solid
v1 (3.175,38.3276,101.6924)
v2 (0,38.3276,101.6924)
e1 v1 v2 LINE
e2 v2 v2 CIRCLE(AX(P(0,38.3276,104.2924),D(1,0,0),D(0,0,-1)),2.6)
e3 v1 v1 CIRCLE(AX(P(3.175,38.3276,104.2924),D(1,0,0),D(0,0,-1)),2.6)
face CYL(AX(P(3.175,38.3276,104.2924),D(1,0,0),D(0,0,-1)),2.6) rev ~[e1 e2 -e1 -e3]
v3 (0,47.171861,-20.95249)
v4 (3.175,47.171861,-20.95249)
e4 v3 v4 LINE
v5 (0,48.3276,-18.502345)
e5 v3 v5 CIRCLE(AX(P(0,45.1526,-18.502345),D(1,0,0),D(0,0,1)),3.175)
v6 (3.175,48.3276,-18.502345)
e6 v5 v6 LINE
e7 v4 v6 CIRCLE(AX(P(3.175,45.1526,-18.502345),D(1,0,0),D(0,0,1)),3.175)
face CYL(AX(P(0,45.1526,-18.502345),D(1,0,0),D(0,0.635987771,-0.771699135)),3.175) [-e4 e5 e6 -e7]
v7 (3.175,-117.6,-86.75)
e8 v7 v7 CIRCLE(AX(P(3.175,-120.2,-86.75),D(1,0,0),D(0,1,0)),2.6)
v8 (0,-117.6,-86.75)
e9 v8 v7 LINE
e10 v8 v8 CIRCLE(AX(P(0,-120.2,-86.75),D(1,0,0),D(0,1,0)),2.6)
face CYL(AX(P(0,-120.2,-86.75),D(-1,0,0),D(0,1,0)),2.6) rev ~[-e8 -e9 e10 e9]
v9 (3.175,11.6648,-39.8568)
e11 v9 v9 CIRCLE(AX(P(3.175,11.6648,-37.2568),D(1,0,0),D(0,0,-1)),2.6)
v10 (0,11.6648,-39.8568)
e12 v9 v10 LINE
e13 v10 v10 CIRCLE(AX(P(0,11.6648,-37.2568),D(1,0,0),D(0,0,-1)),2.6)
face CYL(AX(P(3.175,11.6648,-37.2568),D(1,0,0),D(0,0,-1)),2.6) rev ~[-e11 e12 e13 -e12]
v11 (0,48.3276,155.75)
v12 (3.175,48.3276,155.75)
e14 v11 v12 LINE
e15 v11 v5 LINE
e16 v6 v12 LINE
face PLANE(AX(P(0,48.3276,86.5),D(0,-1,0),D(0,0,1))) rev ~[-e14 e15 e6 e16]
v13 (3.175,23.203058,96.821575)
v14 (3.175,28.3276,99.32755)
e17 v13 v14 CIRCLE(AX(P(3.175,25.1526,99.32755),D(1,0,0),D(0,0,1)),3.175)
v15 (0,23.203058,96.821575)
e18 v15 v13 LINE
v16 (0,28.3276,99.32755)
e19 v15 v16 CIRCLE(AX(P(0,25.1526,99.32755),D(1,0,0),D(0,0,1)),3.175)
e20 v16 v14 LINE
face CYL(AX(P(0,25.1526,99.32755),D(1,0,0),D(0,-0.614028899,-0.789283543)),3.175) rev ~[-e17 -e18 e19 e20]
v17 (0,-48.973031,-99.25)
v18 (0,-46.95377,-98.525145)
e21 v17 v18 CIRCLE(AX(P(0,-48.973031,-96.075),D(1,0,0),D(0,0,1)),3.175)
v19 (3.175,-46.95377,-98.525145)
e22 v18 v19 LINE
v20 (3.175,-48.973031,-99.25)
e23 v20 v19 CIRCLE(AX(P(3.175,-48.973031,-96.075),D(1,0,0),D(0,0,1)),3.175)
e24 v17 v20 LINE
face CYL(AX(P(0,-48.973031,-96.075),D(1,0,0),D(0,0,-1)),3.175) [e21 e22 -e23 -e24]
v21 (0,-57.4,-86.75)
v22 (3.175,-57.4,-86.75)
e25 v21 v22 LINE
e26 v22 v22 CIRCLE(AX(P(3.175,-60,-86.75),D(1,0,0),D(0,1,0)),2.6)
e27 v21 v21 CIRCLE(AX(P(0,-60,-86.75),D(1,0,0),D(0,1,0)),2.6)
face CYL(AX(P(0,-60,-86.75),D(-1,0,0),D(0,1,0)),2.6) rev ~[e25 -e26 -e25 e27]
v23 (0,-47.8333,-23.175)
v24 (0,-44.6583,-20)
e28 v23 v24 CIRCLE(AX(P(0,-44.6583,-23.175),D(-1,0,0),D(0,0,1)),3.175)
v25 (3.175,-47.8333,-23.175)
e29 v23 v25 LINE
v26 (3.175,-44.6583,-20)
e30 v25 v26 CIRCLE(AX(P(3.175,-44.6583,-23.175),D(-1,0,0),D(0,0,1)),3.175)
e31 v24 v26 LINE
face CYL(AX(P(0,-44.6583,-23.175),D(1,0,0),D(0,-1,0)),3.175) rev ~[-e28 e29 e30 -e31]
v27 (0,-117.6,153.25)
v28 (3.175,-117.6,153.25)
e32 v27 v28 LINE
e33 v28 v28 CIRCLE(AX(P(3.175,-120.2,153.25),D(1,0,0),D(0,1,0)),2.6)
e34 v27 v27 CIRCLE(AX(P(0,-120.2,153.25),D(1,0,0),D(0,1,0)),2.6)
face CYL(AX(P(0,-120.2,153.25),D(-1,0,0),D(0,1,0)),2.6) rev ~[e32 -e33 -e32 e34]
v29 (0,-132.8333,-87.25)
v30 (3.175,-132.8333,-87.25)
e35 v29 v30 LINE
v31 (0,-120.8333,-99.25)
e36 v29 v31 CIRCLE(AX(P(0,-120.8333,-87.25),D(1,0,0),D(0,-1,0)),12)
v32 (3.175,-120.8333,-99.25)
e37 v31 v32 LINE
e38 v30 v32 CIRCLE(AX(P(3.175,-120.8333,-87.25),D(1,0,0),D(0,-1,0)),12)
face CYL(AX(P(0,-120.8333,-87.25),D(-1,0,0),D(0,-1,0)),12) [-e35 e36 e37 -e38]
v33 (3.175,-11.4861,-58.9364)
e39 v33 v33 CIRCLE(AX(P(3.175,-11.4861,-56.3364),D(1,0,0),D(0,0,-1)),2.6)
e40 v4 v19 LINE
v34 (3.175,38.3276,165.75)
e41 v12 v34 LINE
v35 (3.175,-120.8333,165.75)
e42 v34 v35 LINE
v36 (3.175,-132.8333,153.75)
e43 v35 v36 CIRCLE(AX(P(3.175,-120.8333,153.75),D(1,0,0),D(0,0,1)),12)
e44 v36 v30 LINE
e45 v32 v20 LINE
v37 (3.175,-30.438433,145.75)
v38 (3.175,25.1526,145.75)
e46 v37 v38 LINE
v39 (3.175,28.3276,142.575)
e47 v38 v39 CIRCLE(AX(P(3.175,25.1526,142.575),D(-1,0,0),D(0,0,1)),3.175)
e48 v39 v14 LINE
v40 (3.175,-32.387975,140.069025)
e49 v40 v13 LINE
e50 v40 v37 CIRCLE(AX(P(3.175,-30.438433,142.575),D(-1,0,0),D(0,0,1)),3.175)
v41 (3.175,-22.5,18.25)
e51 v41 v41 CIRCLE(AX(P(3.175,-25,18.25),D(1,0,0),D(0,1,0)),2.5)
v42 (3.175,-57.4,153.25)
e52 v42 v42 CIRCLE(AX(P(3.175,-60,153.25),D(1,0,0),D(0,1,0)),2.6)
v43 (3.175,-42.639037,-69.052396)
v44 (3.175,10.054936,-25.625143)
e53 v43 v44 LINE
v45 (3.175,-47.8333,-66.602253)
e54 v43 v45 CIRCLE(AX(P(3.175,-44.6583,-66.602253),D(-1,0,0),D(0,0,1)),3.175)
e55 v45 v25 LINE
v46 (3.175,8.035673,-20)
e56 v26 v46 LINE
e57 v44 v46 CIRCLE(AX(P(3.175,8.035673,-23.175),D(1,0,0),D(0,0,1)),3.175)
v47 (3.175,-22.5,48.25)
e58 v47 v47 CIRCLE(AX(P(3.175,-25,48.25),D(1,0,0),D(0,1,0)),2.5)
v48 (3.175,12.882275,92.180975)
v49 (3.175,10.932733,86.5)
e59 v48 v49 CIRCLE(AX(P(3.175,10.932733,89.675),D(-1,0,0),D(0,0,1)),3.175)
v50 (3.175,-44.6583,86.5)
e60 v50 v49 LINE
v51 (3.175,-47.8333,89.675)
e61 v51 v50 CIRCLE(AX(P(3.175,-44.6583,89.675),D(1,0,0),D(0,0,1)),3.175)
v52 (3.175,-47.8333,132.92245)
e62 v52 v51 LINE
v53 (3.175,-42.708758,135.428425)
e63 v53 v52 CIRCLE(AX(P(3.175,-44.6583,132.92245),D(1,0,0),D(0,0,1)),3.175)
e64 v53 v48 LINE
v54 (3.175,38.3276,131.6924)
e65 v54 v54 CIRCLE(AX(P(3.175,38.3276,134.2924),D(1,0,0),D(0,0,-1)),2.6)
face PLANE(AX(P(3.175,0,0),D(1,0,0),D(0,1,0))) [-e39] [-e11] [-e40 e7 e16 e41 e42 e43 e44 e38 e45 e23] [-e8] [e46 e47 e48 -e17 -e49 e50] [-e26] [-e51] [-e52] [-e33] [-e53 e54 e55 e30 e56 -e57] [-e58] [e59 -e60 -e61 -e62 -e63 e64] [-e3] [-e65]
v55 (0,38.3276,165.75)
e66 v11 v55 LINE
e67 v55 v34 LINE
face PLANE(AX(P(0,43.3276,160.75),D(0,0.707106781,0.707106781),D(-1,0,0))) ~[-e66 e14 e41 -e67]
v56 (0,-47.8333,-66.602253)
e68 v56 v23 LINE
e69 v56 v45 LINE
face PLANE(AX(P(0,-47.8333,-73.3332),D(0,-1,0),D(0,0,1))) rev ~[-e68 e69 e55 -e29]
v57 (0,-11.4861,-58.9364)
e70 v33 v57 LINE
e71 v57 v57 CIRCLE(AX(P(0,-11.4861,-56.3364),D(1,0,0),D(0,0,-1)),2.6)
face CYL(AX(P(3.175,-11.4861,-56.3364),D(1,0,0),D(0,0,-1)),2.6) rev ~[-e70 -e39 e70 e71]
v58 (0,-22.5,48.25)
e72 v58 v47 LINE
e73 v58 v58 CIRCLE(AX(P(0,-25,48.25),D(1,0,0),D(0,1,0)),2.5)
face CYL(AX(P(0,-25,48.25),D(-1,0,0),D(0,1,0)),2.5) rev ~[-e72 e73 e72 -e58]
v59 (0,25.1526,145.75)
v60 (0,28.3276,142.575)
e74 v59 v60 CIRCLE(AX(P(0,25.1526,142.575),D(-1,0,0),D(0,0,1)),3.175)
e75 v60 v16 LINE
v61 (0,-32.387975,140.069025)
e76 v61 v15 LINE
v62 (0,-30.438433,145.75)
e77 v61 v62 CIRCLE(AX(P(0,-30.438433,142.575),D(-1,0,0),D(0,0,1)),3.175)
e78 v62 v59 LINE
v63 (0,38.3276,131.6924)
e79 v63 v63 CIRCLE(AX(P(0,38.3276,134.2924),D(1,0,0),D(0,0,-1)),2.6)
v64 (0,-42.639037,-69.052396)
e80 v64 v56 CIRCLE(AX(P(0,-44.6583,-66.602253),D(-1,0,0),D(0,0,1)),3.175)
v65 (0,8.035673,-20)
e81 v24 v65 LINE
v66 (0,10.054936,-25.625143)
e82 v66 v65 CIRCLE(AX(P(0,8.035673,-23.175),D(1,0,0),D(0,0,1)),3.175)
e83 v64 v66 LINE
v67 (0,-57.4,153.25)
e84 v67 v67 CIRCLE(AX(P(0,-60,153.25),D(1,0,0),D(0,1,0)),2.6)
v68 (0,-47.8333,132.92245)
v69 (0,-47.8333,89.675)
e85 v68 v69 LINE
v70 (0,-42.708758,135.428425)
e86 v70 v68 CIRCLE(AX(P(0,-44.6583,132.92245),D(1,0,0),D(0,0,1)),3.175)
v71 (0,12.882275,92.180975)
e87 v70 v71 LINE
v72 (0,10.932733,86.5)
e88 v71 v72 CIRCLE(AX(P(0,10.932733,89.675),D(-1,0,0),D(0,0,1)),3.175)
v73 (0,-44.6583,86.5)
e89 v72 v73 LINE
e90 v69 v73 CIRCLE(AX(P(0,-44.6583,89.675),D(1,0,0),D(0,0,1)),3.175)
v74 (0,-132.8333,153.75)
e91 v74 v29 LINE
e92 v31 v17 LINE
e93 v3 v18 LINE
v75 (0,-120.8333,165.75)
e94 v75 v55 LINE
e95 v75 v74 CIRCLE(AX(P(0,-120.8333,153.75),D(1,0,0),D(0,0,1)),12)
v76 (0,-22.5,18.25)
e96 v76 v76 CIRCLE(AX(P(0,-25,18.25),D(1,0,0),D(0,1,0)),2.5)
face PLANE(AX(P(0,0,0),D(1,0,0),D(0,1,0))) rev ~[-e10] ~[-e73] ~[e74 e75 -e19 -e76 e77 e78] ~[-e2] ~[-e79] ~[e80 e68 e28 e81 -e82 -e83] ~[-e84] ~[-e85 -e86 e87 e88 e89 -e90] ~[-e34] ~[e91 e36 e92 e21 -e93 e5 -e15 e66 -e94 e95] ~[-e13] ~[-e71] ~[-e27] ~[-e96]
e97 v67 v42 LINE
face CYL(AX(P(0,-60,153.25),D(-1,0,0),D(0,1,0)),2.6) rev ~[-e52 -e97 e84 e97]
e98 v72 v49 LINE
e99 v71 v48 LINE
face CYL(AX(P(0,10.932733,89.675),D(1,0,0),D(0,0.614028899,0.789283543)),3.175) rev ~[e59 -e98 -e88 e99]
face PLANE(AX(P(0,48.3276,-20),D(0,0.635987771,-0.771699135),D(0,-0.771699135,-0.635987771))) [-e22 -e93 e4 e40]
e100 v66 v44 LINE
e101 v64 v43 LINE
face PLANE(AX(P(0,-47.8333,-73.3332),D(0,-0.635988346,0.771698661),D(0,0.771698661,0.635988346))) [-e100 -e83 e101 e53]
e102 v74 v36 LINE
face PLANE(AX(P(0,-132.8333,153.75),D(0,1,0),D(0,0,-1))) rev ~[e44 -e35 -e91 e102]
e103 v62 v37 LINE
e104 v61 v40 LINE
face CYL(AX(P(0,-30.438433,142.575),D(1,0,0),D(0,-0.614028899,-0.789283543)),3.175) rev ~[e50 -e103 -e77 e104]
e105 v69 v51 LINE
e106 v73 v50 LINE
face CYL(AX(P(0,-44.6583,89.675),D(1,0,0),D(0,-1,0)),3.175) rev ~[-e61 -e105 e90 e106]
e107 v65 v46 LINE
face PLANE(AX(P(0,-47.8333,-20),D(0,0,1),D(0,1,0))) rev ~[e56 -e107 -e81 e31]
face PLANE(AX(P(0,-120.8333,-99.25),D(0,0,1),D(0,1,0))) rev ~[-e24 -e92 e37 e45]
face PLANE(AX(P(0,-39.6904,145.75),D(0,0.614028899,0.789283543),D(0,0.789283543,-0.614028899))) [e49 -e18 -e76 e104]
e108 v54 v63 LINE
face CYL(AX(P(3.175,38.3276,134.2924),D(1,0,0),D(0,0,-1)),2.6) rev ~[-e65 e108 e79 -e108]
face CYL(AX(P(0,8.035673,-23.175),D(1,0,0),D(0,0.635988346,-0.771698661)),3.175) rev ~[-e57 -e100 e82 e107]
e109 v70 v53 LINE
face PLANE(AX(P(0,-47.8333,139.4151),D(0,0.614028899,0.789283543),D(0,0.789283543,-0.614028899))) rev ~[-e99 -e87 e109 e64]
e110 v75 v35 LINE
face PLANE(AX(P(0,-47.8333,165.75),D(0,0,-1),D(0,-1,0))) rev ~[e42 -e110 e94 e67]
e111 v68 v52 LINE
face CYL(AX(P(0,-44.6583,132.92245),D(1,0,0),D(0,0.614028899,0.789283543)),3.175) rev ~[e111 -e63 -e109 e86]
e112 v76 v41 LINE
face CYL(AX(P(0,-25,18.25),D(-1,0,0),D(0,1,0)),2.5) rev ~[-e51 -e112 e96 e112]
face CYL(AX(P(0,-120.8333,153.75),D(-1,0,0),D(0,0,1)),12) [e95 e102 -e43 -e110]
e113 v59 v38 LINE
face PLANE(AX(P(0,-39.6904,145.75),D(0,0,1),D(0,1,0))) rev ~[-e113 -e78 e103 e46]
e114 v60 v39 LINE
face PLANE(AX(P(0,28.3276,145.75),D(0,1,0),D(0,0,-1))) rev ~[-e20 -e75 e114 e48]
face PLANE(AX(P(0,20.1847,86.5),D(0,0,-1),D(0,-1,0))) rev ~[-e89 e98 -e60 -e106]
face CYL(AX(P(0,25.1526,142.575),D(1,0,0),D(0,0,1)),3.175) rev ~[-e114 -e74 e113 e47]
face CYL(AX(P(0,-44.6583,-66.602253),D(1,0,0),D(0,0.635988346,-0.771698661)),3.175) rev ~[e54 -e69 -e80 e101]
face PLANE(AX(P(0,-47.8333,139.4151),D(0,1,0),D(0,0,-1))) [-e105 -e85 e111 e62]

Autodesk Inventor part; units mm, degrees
ref_plane "YZ Plane" through (0, 0, 0) normal (1, 0, 0) x (0, 1, 0)
ref_plane "XZ Plane" through (0, 0, 0) normal (0, 1, 0) x (-1, 0, 0)
ref_plane "XY Plane" through (0, 0, 0) normal (0, 0, 1) x (1, 0, 0)
sketch "Sketch1" plane through (0, 0, 0) normal (1, 0, 0) x (0, 1, 0)
  line L0 (0, 0) -> (40, 0) construction
  line L1 (40, 0) -> (40, 66.5) construction
  line L2 (40, 66.5) -> (0, 66.5) construction
  line L3 (0, 66.5) -> (0, 0) construction
  line L4 (0, 66.5) -> (40, 66.5) construction
  line L5 (40, 66.5) -> (40, 86.5) construction
  line L6 (40, 86.5) -> (0, 86.5)
  line L7 (0, 86.5) -> (0, 66.5) construction
  line L8 (0, 0) -> (40, 0) construction
  line L9 (40, 0) -> (40, -20) construction
  line L10 (40, -20) -> (0, -20) construction
  line L11 (0, -20) -> (0, 0) construction
  line L12 (48.2, 61.45) -> (-8.2, 61.45) construction
  line L13 (-8.2, 61.45) -> (-8.2, 5.05) construction
  line L14 (-8.2, 5.05) -> (48.2, 5.05) construction
  line L15 (48.2, 5.05) -> (48.2, 61.45) construction
  line L16 (48.2, 33.25) -> (-8.2, 33.25) construction
  line L17 (40, 33.25) -> (0, 33.25) construction
  line L18 (43.57, 56.82) -> (-3.57, 56.82) construction
  line L19 (-3.57, 56.82) -> (-3.57, 9.68) construction
  line L20 (-3.57, 9.68) -> (43.57, 9.68) construction
  line L21 (43.57, 9.68) -> (43.57, 56.82) construction
  line L22 (43.57, 56.82) -> (48.2, 56.82) construction
  line L23 (43.57, 56.82) -> (43.57, 61.45) construction
  line L24 (-3.57, 9.68) -> (-8.2, 9.68) construction
  line L25 (-3.57, 9.68) -> (-3.57, 5.05) construction
  line L26 (40, -10) -> (0, -10) construction
  line L27 (40, 76.5) -> (0, 76.5) construction
  circle A0 centre (30, 76.5) radius 2.1
  circle A1 centre (10, 76.5) radius 2.1
  circle A2 centre (30, -10) radius 2.1
  circle A3 centre (10, -10) radius 2.1
  circle A4 centre (43.57, 56.82) radius 2.6
  circle A5 centre (43.57, 9.68) radius 2.6
  circle A6 centre (-3.57, 9.68) radius 2.6
  circle A7 centre (-3.57, 56.82) radius 2.6
  circle A8 centre (20, 33.25) radius 19.15
  circle A9 centre (-25, 18.25) radius 11.08 construction
  circle A10 centre (-25, 18.25) radius 13 construction
  circle A11 centre (-25, 18.25) radius 2.5
  line L28 (-60, 153.25) -> (-60, -86.75) construction
  circle A12 centre (-60, -86.75) radius 2.6
  circle A13 centre (-60, 153.25) radius 2.6
  line L29 (-120.2, 153.25) -> (-120.2, -86.75) construction
  circle A14 centre (-120.2, -86.75) radius 2.6
  circle A15 centre (-120.2, 153.25) radius 2.6
  circle A16 centre (-60, -86.75) radius 12 construction
  circle A17 centre (-120.2, -86.75) radius 12 construction
  circle A18 centre (-120.2, 153.25) radius 12 construction
  circle A19 centre (-60, 153.25) radius 12 construction
  line L30 (-110, 482.7599) -> (-70, 482.7599) construction
  line L31 (-70, -517.2401) -> (-110, -517.2401) construction
  circle A20 centre (-25, 48.25) radius 2.5
  circle A21 centre (-25, 48.25) radius 11.08 construction
  circle A22 centre (-25, 48.25) radius 13 construction
  circle A23 centre (20, 33.25) radius 11.08 construction
  circle A24 centre (20, 33.25) radius 13 construction
  line L32 (-23.1873, 29.1807) -> (18.1873, 22.3193) construction
  line L33 (18.1873, 44.1807) -> (-23.1873, 37.3193) construction
  line L34 (-120.8333, -99.25) -> (-47.8333, -99.25)
  line L35 (-47.8333, 165.75) -> (-120.8333, 165.75)
  line L36 (-132.8333, 153.75) -> (-132.8333, -87.25)
  line L37 (-60, 153.25) -> (-120.2, 153.25) construction
  line L38 (-120.2, -86.75) -> (-60, -86.75) construction
  line L39 (-60, 153.25) -> (-60, 165.75) construction
  line L40 (-120.2, -86.75) -> (-120.2, -99.25) construction
  line L41 (48.3276, -20) -> (48.3276, 86.5)
  line L42 (17.6122, 86.5) -> (40, 86.5) construction
  arc A25 (-120.8333, 165.75) -> (-132.8333, 153.75) centre (-120.8333, 153.75) ccw
  arc A26 (-132.8333, -87.25) -> (-120.8333, -99.25) centre (-120.8333, -87.25) ccw
  line L43 (48.3276, -20) -> (-47.8333, -99.25)
  line L44 (-47.8333, 165.75) -> (-47.8333, -99.25) construction
  line L45 (-120.2, -86.75) -> (-132.8333, -86.75) construction
  line L46 (-60, 153.25) -> (-47.8333, 153.25) construction
  line L47 (-36.08, 48.25) -> (-36.08, 286.613) construction
  line L48 (-47.8333, 145.75) -> (-47.8333, 86.5)
  line L49 (-47.8333, 86.5) -> (16.8804, 86.5)
  line L50 (-47.8333, -73.3332) -> (16.8804, -20)
  line L51 (-47.8333, -20) -> (16.8804, -20)
  line L52 (-47.8333, -73.3332) -> (-47.8333, -20)
  line L53 (48.3276, 86.5) -> (48.3276, 165.75)
  line L54 (48.3276, 165.75) -> (-47.8333, 165.75)
  line L55 (-47.8333, 145.75) -> (28.3276, 145.75)
  line L56 (28.3276, 145.75) -> (28.3276, 86.5)
  line L57 (-47.8333, 145.75) -> (28.3276, 86.5) construction
  line L58 (-39.6904, 145.75) -> (28.3276, 92.8349)
  line L59 (-47.8333, 139.4151) -> (20.1847, 86.5)
  point P0 (-132.8333, -99.25)
  point P1 (-132.8333, 165.75)
  point P2 (-47.8333, 139.8332)
  point P3 (0, 86.5)
  point P4 (0, 86.5)
  dimension "d190" = 22.16
  dimension "d165" = 40
  dimension "d166" = 66.5
  dimension "d167" = 40
  dimension "d168" = 20
  dimension "d169" = 40
  dimension "d170" = 20
  dimension "d171" = 56.4
  dimension "d172" = 56.4
  dimension "d173" = 0
  dimension "d174" = 8.2
  dimension "d175" = 47.14
  dimension "d176" = 47.14
  dimension "d177" = 4.2
  dimension "d178" = 20
  dimension "d179" = 10
  dimension "d180" = 10
  dimension "d181" = 20
  dimension "d182" = 4.2
  dimension "d183" = 4.2
  dimension "d184" = 4.2
  dimension "d185" = 5.2
  dimension "d186" = 5.2
  dimension "d187" = 5.2
  dimension "d188" = 5.2
  dimension "d189" = 38.3
  dimension "d191" = 26
  dimension "d192" = 5
  dimension "d193" = 240
  dimension "d194" = 60
  dimension "d195" = 5.2
  dimension "d196" = 5.2
  dimension "d197" = 5.2
  dimension "d198" = 5.2
  dimension "d199" = 60.2
  dimension "d200" = 24
  dimension "d201" = 24
  dimension "d202" = 24
  dimension "d203" = 24
  dimension "d204" = 40
  dimension "d205" = 1000
  dimension "d206" = 45
  dimension "d207" = 5
  dimension "d208" = 22.16
  dimension "d209" = 26
  dimension "d210" = 45
  dimension "d211" = 22.16
  dimension "d212" = 26
  dimension "d213" = 15
  dimension "d214" = 15
  dimension "d215" = 265
  dimension "d216" = 85
  dimension "d217" = 106.5
  dimension "d218" = 12
  dimension "d219" = 72.8333
  dimension "d220" = 28.3276
  dimension "d221" = 53.25
  dimension "d222" = 85
  dimension "d223" = 132.5
  dimension "d224" = 60.2
  dimension "d225" = 20
  dimension "d226" = 20
  dimension "d227" = 5
  dimension "d228" = 5
extrude "Extrusion1" add sketch "Sketch1" along normal blind 3.175 contours L6 L59 L48 L55 L58 L56 | A0 | A1 | A2 | A3 | A4 | A5 | A6 | A7 | A8 | A26 L36 A25 L35 L54 L53 L41 L43 L34
sketch "Sketch6" plane through (3.175, 0, 0) normal (1, 0, 0) x (0, 0, -1)
  line L0 (20, 16.8804) -> (73.3332, -47.8333)
  line L1 (20, 16.8804) -> (73.3332, -47.8333)
  line L2 (39.0796, -6.2705) -> (54.5136, 6.4492) construction
  line L3 (99.25, -47.8333) -> (20, 48.3276)
  circle A0 centre (37.2568, 11.6648) radius 2.6
  circle A1 centre (56.3364, -11.4861) radius 2.6
  line L4 (37.2568, 11.6648) -> (46.7966, 0.0893) construction
  line L5 (56.3364, -11.4861) -> (46.7966, 0.0893) construction
  line L6 (-145.75, 28.3276) -> (-92.8349, 28.3276)
  line L7 (-119.2924, 28.3276) -> (-119.2924, 48.3276) construction
  line L8 (20, 48.3276) -> (-165.75, 48.3276) construction
  circle A2 centre (-104.2924, 38.3276) radius 2.6
  circle A3 centre (-134.2924, 38.3276) radius 2.6
  line L9 (-104.2924, 38.3276) -> (-119.2924, 38.3276) construction
  line L10 (-134.2924, 38.3276) -> (-119.2924, 38.3276) construction
  point P0 (0, 0)
  dimension "d229" = 5.2
  dimension "d230" = 5.2
  dimension "d231" = 15
  dimension "d232" = 15
  dimension "d233" = 30
  dimension "d234" = 5.2
  dimension "d235" = 5.2
  dimension "d236" = 15
  dimension "d237" = 15
extrude "Extrusion6" cut sketch "Sketch6" against normal through all
fillet "Fillet2" radius 3.175 11 edges at (1.5875, 28.3276, 92.8349) (1.5875, 20.1847, 86.5) (1.5875, 28.3276, 145.75) (1.5875, -39.6904, 145.75) (1.5875, -47.8333, 139.4151) (1.5875, -47.8333, 86.5) (1.5875, 48.3276, -20) (1.5875, 16.8804, -20) (1.5875, -47.8333, -20) (1.5875, -47.8333, -73.3332) (1.5875, -47.8333, -99.25)
chamfer "Chamfer1" distance 10 angle 45 1 edges at (1.5875, 48.3276, 165.75)
properties part number "X Axis Belt V Wheel LEFT Outside Frame Machined No Logo"
